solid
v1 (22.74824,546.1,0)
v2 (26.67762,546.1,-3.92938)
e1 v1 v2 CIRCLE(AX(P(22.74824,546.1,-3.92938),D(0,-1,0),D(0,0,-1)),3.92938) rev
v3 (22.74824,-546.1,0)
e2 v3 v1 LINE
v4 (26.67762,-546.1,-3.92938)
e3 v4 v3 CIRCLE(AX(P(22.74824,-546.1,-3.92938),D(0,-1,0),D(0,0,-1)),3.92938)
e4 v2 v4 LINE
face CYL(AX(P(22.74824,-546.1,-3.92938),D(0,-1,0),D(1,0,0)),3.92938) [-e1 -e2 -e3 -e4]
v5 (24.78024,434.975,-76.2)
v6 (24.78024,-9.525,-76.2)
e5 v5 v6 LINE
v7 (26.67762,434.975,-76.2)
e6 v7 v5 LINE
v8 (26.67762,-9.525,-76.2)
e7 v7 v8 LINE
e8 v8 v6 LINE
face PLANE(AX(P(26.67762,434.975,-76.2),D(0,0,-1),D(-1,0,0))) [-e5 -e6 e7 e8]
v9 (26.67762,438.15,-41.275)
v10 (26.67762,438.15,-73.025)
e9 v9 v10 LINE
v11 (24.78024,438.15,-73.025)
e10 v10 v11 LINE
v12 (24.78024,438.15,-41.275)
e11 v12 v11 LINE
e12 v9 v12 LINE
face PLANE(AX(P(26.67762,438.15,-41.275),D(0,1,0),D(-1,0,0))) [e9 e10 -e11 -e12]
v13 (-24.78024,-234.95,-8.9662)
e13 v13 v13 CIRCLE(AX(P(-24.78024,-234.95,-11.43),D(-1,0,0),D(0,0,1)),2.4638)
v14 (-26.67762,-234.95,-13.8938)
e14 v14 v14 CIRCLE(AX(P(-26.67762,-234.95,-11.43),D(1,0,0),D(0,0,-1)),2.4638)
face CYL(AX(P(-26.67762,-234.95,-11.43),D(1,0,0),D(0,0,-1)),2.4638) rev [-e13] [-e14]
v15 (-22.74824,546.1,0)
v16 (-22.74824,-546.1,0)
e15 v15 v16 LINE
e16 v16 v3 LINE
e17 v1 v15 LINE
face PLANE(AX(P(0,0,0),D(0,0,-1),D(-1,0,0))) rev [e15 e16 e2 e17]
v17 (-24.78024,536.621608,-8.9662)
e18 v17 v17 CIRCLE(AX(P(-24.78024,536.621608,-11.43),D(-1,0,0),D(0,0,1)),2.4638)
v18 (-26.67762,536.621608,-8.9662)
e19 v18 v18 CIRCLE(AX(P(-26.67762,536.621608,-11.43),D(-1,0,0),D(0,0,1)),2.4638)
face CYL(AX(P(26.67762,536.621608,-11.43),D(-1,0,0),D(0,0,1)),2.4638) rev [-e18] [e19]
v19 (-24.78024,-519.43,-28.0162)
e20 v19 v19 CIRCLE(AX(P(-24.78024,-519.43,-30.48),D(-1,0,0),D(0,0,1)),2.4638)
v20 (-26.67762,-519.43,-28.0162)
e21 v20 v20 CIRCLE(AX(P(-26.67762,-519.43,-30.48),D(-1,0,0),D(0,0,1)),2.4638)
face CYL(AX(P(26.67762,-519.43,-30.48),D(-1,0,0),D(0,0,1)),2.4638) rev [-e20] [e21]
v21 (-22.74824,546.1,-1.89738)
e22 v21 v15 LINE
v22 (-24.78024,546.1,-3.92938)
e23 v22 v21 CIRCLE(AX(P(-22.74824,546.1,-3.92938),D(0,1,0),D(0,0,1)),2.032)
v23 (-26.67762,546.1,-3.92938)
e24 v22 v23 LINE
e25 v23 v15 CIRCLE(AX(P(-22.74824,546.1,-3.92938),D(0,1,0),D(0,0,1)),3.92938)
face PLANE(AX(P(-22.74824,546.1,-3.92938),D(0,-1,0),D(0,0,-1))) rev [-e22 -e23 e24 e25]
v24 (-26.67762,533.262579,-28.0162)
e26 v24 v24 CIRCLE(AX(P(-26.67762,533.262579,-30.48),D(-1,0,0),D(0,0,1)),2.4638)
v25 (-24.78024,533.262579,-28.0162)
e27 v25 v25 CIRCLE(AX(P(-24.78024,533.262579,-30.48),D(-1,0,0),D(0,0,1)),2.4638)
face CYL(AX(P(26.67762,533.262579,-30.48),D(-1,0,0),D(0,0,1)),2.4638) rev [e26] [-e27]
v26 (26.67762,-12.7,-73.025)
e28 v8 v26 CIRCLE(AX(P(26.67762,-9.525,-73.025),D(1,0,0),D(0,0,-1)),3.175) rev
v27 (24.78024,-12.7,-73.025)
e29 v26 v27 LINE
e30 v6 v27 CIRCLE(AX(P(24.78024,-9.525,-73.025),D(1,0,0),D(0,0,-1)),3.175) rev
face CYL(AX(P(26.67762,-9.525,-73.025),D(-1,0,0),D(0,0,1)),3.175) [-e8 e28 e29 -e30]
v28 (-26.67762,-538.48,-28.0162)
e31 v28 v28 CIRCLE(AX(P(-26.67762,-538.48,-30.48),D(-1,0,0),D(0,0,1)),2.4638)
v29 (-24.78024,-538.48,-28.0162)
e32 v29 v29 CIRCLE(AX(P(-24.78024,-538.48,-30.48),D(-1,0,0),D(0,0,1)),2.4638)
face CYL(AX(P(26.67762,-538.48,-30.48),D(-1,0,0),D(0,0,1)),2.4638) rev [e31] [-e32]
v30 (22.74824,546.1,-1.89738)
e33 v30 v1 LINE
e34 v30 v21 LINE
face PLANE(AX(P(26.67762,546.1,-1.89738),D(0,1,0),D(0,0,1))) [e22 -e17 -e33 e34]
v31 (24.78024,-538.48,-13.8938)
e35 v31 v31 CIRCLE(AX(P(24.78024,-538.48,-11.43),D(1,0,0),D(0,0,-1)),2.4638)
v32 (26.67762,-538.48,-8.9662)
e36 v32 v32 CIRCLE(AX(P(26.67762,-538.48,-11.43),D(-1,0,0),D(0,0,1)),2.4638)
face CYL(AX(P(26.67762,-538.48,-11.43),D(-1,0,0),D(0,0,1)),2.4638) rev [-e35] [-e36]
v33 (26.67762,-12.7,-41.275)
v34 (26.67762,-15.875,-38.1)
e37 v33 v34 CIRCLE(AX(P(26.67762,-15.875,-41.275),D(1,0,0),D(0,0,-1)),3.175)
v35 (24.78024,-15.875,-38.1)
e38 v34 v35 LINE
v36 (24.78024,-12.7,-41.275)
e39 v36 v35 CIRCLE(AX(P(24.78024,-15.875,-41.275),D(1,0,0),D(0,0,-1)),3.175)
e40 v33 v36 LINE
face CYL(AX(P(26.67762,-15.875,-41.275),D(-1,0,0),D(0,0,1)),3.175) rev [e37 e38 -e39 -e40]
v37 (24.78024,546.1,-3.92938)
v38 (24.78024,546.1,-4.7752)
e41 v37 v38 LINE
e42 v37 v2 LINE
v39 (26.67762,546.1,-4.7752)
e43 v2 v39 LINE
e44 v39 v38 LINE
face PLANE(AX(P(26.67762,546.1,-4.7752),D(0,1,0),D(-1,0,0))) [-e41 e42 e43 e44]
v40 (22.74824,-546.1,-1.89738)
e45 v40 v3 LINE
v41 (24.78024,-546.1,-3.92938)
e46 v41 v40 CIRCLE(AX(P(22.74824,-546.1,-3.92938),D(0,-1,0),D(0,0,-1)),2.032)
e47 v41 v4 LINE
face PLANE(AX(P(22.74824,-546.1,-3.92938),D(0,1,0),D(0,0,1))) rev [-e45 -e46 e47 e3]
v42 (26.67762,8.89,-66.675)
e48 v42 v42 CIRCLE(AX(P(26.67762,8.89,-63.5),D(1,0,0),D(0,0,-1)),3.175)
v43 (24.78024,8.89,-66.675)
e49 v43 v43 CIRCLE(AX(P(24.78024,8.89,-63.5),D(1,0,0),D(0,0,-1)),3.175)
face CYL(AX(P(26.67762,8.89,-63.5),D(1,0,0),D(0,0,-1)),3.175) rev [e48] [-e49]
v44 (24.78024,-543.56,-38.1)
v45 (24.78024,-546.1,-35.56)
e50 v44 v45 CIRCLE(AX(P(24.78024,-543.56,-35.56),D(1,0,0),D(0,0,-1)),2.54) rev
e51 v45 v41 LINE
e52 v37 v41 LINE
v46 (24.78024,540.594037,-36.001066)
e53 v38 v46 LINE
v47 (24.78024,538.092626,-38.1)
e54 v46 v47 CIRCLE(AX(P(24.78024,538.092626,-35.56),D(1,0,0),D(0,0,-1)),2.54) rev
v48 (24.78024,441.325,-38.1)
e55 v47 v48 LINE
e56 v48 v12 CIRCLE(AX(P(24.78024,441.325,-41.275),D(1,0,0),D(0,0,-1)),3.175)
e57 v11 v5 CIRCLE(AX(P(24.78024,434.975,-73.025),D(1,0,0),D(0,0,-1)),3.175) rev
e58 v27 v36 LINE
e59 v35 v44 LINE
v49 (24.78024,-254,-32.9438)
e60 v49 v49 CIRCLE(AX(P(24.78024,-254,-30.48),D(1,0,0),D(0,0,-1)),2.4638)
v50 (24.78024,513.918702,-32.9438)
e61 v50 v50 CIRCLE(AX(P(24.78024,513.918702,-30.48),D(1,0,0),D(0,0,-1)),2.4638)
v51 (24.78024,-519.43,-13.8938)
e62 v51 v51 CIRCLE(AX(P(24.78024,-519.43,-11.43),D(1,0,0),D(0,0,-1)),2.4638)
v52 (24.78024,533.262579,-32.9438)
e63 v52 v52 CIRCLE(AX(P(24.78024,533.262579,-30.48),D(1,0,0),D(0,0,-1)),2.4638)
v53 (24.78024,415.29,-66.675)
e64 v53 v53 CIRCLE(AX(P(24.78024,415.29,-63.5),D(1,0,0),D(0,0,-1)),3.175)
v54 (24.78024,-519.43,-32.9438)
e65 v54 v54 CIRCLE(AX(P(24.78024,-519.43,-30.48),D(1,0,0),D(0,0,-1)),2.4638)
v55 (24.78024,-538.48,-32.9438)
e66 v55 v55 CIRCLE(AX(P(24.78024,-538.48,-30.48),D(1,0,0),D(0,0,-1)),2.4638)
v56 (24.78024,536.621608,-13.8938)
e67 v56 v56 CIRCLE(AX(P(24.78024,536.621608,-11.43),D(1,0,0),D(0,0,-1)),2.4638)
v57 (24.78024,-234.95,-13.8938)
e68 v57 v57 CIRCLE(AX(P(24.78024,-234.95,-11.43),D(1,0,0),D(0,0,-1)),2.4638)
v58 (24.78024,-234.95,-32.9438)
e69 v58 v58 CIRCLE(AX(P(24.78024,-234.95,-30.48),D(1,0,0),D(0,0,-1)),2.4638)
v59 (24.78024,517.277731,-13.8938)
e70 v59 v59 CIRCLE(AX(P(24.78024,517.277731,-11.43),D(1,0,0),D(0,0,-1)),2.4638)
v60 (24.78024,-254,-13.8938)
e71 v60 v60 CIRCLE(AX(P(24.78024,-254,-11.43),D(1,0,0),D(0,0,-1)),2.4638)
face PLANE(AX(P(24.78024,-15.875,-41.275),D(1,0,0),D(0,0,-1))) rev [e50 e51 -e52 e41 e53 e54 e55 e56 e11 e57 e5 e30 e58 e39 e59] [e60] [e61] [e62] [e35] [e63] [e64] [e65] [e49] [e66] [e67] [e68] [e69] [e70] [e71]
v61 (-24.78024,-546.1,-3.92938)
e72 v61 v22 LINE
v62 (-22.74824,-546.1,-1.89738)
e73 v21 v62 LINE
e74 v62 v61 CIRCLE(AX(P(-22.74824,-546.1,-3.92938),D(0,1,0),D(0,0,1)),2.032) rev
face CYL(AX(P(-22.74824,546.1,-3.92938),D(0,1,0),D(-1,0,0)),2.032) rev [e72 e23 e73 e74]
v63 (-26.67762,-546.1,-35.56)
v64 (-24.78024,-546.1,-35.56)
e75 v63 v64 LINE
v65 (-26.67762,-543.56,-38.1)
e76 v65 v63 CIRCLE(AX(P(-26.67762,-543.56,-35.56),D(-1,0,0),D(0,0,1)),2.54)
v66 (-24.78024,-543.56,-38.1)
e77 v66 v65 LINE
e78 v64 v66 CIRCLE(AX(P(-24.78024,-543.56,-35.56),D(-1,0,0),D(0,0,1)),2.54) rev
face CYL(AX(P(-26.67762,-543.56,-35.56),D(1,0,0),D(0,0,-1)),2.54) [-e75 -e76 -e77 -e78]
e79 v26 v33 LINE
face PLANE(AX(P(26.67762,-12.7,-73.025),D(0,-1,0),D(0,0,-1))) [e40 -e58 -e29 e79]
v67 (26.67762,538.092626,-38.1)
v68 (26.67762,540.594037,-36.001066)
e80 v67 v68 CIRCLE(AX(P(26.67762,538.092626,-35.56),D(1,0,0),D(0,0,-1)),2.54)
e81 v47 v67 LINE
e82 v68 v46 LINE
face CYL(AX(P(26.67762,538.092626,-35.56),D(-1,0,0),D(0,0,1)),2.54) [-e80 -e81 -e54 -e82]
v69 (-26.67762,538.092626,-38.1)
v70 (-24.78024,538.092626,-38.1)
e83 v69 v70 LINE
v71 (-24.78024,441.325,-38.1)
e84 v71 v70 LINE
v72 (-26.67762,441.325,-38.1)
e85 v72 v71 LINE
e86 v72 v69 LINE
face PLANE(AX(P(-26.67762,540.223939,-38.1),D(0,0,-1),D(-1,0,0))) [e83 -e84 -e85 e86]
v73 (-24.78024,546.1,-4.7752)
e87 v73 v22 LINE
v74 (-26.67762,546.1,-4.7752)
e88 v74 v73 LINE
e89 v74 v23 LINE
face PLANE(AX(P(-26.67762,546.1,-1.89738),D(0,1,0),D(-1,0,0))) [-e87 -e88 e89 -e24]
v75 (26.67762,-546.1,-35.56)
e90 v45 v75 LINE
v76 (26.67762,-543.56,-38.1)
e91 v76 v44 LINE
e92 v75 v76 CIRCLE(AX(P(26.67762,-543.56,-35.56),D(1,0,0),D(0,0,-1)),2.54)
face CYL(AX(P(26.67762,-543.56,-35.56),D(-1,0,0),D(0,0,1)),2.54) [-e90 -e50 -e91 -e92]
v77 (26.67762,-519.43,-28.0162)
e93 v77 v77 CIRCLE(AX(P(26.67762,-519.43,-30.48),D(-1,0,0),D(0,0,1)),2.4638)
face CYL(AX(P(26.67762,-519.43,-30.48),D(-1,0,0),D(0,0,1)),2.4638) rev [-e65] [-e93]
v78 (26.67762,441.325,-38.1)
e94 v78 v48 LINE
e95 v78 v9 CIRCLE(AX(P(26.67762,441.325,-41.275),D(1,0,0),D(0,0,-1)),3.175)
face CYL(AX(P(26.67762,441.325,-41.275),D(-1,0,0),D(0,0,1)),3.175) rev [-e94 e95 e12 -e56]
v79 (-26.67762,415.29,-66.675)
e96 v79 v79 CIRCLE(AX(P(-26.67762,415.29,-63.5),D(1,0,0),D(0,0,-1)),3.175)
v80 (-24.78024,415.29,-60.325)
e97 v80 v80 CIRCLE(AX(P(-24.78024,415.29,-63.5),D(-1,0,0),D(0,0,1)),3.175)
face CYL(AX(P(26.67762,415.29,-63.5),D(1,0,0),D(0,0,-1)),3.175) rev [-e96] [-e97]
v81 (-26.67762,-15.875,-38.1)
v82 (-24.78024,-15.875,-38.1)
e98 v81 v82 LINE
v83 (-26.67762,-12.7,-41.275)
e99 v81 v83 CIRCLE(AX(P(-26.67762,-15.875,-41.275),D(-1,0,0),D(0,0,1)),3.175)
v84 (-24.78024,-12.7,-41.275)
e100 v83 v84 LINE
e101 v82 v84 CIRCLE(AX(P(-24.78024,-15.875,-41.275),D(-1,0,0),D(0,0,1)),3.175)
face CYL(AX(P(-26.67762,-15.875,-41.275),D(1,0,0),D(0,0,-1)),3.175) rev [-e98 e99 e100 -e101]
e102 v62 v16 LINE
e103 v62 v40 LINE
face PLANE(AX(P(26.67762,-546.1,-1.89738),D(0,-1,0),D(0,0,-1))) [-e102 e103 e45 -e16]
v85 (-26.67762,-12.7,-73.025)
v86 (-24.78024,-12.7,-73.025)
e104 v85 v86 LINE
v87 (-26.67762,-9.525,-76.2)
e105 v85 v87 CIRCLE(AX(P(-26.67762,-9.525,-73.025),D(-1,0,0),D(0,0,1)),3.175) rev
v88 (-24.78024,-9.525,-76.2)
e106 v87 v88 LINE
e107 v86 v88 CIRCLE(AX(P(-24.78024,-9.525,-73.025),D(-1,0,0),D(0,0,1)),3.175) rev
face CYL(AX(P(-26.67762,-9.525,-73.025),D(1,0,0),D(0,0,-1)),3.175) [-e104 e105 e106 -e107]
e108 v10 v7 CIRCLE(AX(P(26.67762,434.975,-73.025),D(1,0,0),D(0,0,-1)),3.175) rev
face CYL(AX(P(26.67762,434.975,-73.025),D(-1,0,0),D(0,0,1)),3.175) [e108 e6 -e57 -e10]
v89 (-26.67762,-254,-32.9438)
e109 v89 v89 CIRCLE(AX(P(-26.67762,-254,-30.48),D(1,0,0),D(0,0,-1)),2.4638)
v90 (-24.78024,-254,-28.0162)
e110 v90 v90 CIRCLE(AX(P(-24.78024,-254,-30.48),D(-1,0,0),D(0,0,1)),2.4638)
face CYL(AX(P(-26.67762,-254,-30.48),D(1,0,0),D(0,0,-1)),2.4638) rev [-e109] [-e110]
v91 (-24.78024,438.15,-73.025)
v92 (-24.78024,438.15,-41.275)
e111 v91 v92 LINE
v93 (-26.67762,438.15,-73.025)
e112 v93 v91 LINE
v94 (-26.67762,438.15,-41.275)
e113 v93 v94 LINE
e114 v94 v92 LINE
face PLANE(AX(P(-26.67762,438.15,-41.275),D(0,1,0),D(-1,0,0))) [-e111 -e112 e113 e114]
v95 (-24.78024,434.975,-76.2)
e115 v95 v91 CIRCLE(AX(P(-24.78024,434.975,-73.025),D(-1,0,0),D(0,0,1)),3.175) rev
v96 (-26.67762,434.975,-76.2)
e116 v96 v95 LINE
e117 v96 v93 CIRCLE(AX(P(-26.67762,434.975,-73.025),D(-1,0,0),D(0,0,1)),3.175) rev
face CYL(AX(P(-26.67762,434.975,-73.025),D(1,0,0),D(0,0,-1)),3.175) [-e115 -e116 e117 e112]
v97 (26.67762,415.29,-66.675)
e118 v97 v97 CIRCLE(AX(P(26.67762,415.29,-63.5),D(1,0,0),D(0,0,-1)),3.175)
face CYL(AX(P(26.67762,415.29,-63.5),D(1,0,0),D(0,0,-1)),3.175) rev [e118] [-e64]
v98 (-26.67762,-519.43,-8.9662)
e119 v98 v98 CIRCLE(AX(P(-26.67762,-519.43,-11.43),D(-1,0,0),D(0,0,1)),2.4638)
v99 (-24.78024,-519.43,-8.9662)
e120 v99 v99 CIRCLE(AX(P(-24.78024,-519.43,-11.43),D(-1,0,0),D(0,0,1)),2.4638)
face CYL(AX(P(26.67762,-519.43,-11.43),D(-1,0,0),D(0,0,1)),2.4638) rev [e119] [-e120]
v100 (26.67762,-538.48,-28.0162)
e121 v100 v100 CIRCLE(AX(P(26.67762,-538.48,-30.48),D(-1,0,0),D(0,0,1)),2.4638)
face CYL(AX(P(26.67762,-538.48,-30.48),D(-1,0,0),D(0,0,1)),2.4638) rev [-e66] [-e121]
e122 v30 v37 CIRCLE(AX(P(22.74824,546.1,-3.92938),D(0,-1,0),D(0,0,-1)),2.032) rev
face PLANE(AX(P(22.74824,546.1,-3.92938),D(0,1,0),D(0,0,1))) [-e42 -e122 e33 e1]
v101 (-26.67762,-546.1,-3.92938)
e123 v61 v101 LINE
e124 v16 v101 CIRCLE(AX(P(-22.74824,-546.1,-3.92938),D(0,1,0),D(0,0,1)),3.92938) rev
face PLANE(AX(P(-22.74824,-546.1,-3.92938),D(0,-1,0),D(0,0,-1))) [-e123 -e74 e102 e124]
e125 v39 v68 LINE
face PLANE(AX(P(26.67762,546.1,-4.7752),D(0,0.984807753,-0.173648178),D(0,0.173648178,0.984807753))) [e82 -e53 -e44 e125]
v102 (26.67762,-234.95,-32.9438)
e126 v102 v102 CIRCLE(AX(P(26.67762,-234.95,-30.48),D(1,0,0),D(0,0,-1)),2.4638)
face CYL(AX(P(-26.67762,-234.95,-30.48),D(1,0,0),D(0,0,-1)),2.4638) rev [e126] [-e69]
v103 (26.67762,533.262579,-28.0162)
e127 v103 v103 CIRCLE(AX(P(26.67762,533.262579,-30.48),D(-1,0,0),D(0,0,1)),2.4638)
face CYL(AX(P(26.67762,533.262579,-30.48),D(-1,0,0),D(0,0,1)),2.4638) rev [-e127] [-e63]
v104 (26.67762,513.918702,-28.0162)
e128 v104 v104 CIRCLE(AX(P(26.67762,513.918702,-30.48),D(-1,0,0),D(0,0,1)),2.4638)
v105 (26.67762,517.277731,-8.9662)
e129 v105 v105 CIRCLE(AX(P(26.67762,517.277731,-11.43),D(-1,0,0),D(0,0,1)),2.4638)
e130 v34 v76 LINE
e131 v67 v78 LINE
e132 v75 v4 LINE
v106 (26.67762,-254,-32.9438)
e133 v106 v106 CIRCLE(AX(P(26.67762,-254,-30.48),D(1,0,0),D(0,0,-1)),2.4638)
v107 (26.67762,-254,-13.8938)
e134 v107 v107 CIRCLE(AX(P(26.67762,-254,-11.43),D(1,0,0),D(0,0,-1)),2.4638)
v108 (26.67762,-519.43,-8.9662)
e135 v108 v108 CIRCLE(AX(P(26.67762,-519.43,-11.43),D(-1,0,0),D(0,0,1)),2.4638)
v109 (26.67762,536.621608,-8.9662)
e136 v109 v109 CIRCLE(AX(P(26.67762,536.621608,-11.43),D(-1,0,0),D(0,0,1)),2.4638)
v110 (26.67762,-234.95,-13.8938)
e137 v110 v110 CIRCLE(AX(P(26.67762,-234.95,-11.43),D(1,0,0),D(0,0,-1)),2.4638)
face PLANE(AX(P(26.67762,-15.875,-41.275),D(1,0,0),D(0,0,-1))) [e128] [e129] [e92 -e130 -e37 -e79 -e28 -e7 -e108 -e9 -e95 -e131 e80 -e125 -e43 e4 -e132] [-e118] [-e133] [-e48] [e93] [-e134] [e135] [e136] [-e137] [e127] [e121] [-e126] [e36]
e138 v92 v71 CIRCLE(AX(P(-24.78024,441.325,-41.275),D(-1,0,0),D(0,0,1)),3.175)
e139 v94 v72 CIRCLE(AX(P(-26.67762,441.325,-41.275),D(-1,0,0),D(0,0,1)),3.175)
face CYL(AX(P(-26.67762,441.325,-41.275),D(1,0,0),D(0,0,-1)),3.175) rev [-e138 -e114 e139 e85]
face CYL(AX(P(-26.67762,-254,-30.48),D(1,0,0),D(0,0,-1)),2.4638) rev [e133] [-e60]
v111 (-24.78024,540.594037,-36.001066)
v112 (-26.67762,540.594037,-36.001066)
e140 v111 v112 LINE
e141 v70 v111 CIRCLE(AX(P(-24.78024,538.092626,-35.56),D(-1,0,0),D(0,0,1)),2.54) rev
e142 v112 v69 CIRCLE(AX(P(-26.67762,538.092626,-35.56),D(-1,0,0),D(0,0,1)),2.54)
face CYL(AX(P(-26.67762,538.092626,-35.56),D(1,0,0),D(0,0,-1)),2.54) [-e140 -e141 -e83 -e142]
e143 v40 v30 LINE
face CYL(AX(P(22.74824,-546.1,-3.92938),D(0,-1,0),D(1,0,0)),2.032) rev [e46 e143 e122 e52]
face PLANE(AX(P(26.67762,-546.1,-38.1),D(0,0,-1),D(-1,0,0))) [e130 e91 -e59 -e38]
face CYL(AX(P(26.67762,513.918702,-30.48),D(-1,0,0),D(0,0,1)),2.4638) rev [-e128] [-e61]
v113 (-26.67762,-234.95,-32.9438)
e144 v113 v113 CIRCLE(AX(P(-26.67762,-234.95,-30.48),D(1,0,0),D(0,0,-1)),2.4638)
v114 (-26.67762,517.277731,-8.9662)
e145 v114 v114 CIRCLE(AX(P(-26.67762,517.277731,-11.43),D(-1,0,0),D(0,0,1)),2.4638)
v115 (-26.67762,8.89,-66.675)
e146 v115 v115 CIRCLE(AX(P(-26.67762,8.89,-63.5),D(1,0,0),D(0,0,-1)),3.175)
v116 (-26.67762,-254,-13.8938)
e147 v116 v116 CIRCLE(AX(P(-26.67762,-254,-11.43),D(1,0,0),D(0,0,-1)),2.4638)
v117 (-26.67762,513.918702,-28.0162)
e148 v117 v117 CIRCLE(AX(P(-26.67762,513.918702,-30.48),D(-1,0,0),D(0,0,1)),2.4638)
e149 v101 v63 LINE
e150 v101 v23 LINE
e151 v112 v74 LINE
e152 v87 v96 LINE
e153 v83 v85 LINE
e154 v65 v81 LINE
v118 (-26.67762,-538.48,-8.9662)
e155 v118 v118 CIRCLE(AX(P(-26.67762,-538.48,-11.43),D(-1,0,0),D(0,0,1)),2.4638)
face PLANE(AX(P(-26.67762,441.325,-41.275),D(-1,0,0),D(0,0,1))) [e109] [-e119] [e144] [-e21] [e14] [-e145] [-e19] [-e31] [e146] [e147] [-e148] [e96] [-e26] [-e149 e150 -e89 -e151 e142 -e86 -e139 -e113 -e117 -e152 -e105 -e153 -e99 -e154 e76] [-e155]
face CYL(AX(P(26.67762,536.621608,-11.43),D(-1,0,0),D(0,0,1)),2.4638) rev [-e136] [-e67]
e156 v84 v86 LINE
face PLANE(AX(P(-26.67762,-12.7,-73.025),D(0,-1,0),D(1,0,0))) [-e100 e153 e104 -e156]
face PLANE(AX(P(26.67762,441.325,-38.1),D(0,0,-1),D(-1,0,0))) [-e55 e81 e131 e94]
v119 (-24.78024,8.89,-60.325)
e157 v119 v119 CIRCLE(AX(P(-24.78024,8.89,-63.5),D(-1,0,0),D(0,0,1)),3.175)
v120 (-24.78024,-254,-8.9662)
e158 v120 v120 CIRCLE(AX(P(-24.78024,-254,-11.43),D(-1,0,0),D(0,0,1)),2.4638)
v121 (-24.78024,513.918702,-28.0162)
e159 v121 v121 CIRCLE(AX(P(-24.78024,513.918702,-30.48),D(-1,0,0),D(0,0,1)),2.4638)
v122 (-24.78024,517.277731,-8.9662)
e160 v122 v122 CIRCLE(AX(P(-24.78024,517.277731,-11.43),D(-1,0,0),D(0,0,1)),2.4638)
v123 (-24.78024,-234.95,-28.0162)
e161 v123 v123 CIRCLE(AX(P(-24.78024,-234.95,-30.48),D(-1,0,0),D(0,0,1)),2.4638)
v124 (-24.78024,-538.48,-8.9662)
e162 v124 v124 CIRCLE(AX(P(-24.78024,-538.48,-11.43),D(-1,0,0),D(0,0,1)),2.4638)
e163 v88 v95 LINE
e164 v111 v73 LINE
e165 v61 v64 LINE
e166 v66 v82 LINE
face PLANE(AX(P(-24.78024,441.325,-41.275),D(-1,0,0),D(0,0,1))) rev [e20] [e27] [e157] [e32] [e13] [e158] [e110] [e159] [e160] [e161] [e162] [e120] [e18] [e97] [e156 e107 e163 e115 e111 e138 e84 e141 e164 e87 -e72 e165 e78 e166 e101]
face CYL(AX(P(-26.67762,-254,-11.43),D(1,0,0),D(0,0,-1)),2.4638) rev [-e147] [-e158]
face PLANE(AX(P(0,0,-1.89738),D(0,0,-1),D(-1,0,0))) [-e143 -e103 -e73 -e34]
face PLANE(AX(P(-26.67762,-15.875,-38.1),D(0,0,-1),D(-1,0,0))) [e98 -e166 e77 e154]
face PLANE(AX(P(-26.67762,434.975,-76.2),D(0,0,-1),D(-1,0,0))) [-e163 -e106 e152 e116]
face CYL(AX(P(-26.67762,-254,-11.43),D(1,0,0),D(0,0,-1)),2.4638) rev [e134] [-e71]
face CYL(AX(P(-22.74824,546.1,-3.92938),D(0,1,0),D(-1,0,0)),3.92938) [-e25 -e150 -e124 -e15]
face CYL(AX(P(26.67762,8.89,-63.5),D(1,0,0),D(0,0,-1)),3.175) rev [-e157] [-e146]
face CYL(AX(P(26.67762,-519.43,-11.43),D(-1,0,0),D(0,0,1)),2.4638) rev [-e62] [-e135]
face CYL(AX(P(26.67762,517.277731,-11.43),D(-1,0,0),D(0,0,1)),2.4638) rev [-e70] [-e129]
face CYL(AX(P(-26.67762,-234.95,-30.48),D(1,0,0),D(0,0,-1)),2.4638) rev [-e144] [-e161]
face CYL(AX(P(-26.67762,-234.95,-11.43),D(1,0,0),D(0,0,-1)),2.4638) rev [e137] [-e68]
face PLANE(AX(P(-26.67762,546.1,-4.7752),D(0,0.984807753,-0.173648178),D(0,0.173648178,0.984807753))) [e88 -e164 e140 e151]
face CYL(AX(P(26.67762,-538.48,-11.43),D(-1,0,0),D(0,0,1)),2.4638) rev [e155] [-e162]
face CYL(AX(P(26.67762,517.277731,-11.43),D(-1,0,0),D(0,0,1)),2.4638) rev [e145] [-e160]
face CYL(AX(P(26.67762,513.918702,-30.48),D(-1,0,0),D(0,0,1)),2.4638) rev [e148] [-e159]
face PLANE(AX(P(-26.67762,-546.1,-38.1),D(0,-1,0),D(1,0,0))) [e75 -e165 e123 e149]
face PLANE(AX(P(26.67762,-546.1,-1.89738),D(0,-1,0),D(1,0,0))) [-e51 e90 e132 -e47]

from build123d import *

# Parameters (mm, degrees)
SKETCH1_W                    = 53.35524
SKETCH1_H                    = 1092.2
BASE_FLANGE1_DEPTH           = 1.89738
EDGE_FLANGE1_STRIP_W         = 11.65352
EDGE_FLANGE1_STRIP_H         = 1.89738
EDGE_FLANGE1_STRIP_CUT_DEPTH = 1092.2
EDGE_FLANGE1_DEPTH           = 1092.2
EDGE_FLANGE1_FLAT_DEPTH      = 1.89738
EDGE_FLANGE2_STRIP_W         = 11.65352
EDGE_FLANGE2_STRIP_H         = 1.89738
EDGE_FLANGE2_STRIP_CUT_DEPTH = 1092.2
EDGE_FLANGE2_DEPTH           = 1092.2
EDGE_FLANGE2_FLAT_DEPTH      = 1.89738
FILLET1_R                    = 2.54
SKETCH12_R                   = 2.4638
CUT_EXTRUDE1_DEPTH           = 554.966092496
SKETCH13_R                   = 2.4638
CUT_EXTRUDE2_DEPTH           = 554.966092496
SKETCH14_R                   = 2.4638
CUT_EXTRUDE3_DEPTH           = 554.966092496
E_0_25_DIAMETER_HOLE1_D      = 6.35


# Sheet-metal steps are written as plain solids
with BuildPart() as part:
    # Sketch1 → Base-Flange1 (new body)
    with BuildSketch(Plane.XY):
        Rectangle(SKETCH1_W, SKETCH1_H)
    extrude(amount=-BASE_FLANGE1_DEPTH)

    # Edge-Flange1 strip (across the edge) → Edge-Flange1 strip cut (cut)
    with BuildSketch(Plane(origin=(26.67762, 546.1, -1.89738), x_dir=(-1, 0, 0), z_dir=(0, -1, 0))):
        with Locations((-1.89738, -0.94869)):
            Rectangle(EDGE_FLANGE1_STRIP_W, EDGE_FLANGE1_STRIP_H)
    extrude(amount=EDGE_FLANGE1_STRIP_CUT_DEPTH, mode=Mode.SUBTRACT)

    # Edge-Flange1 bend section (across the edge) → Edge-Flange1 (add)
    with BuildSketch(Plane(origin=(26.67762, 546.1, -1.89738), x_dir=(-1, 0, 0), z_dir=(0, -1, 0))):
        with BuildLine():
            Line((0, 2.032), (1.89738, 2.032))
            ThreePointArc((1.89738, 2.032), (2.492539021, 0.595159021), (3.92938, 0))
            Line((3.92938, 0), (3.92938, -1.89738))
            ThreePointArc((3.92938, -1.89738), (1.150888756, -0.746491244), (0, 2.032))
        make_face()
    extrude(amount=EDGE_FLANGE1_DEPTH)

    # Edge-Flange1 profile (on flange) → Edge-Flange1 flat (add)
    with BuildSketch(Plane(origin=(26.67762, 0, -1.89738), x_dir=(0, 1, 0), z_dir=(-1, 0, 0))):
        with BuildLine():
            Line((540.223938633, 36.20262), (441.325, 36.20262))
            ThreePointArc((441.325, 36.20262), (439.07993597, 37.13255597), (438.15, 39.37762))
            Line((438.15, 39.37762), (438.15, 71.12762))
            ThreePointArc((438.15, 71.12762), (437.22006403, 73.37268403), (434.975, 74.30262))
            Line((434.975, 74.30262), (-9.525, 74.30262))
            ThreePointArc((-9.525, 74.30262), (-11.77006403, 73.37268403), (-12.7, 71.12762))
            Line((-12.7, 71.12762), (-12.7, 39.37762))
            ThreePointArc((-12.7, 39.37762), (-13.62993597, 37.13255597), (-15.875, 36.20262))
            Line((-15.875, 36.20262), (-546.1, 36.20262))
            Line((-546.1, 36.20262), (-546.1, 2.032))
            Line((-546.1, 2.032), (546.1, 2.032))
            Line((546.1, 2.032), (546.1, 2.87782))
            Line((546.1, 2.87782), (540.223938633, 36.20262))
        make_face()
    extrude(amount=EDGE_FLANGE1_FLAT_DEPTH)

    # Edge-Flange2 strip (across the edge) → Edge-Flange2 strip cut (cut)
    with BuildSketch(Plane(origin=(-26.67762, -546.1, -1.89738), x_dir=(1, 0, 0), z_dir=(0, 1, 0))):
        with Locations((-1.89738, -0.94869)):
            Rectangle(EDGE_FLANGE2_STRIP_W, EDGE_FLANGE2_STRIP_H)
    extrude(amount=EDGE_FLANGE2_STRIP_CUT_DEPTH, mode=Mode.SUBTRACT)

    # Edge-Flange2 bend section (across the edge) → Edge-Flange2 (add)
    with BuildSketch(Plane(origin=(-26.67762, -546.1, -1.89738), x_dir=(1, 0, 0), z_dir=(0, 1, 0))):
        with BuildLine():
            Line((0, 2.032), (1.89738, 2.032))
            ThreePointArc((1.89738, 2.032), (2.492539021, 0.595159021), (3.92938, 0))
            Line((3.92938, 0), (3.92938, -1.89738))
            ThreePointArc((3.92938, -1.89738), (1.150888756, -0.746491244), (0, 2.032))
        make_face()
    extrude(amount=EDGE_FLANGE2_DEPTH)

    # Edge-Flange2 profile (on flange) → Edge-Flange2 flat (add)
    with BuildSketch(Plane(origin=(-26.67762, 0, -1.89738), x_dir=(0, -1, 0), z_dir=(1, 0, 0))):
        with BuildLine():
            Line((-441.325, 36.20262), (-540.223938633, 36.20262))
            Line((-540.223938633, 36.20262), (-546.1, 2.87782))
            Line((-546.1, 2.87782), (-546.1, 2.032))
            Line((-546.1, 2.032), (546.1, 2.032))
            Line((546.1, 2.032), (546.1, 36.20262))
            Line((546.1, 36.20262), (15.875, 36.20262))
            ThreePointArc((15.875, 36.20262), (13.62993597, 37.13255597), (12.7, 39.37762))
            Line((12.7, 39.37762), (12.7, 71.12762))
            ThreePointArc((12.7, 71.12762), (11.77006403, 73.37268403), (9.525, 74.30262))
            Line((9.525, 74.30262), (-434.975, 74.30262))
            ThreePointArc((-434.975, 74.30262), (-437.22006403, 73.37268403), (-438.15, 71.12762))
            Line((-438.15, 71.12762), (-438.15, 39.37762))
            ThreePointArc((-438.15, 39.37762), (-439.07993597, 37.13255597), (-441.325, 36.20262))
        make_face()
    extrude(amount=EDGE_FLANGE2_FLAT_DEPTH)

    # Fillet1
    fillet1_edges = [part.edges().sort_by_distance(p)[0] for p in [
        (25.72893, -546.1, -38.1),
        (25.72893, 540.223938633, -38.1),
        (-25.72893, -546.1, -38.1),
        (-25.72893, 540.223938633, -38.1),
    ]]
    fillet(fillet1_edges, radius=FILLET1_R)

    # Sketch12 → Cut-Extrude1 (cut, through all)
    with BuildSketch(Plane.ZY.offset(26.67762)):
        with Locations((-30.48, -538.48)):
            Circle(SKETCH12_R)
        with Locations((-30.48, -519.43)):
            Circle(SKETCH12_R)
        with Locations((-11.43, -519.43)):
            Circle(SKETCH12_R)
        with Locations((-11.43, -538.48)):
            Circle(SKETCH12_R)
    extrude(amount=-CUT_EXTRUDE1_DEPTH, mode=Mode.SUBTRACT)

    # Sketch13 → Cut-Extrude2 (cut, through all)
    with BuildSketch(Plane.ZY.offset(26.67762)):
        with Locations((-30.48, 533.262579053)):
            Circle(SKETCH13_R)
        with Locations((-11.43, 536.621608035)):
            Circle(SKETCH13_R)
        with Locations((-11.43, 517.277731079)):
            Circle(SKETCH13_R)
        with Locations((-30.48, 513.918702097)):
            Circle(SKETCH13_R)
    extrude(amount=-CUT_EXTRUDE2_DEPTH, mode=Mode.SUBTRACT)

    # Sketch14 → Cut-Extrude3 (cut, through all)
    with BuildSketch(Plane(origin=(26.67762, 0, 0), x_dir=(0, 0, -1), z_dir=(1, 0, 0))):
        with Locations((11.43, -234.95)):
            Circle(SKETCH14_R)
        with Locations((11.43, -254)):
            Circle(SKETCH14_R)
        with Locations((30.48, -254)):
            Circle(SKETCH14_R)
        with Locations((30.48, -234.95)):
            Circle(SKETCH14_R)
    extrude(amount=-CUT_EXTRUDE3_DEPTH, mode=Mode.SUBTRACT)

    # E (0.25) Diameter Hole1 (through all)
    with Locations(Plane(origin=(26.67762, 0, 0), x_dir=(0, 0, -1), z_dir=(1, 0, 0))):
        with Locations((63.5, 415.29), (63.5, 8.89)):
            Hole(E_0_25_DIAMETER_HOLE1_D / 2)


solid = part.part
